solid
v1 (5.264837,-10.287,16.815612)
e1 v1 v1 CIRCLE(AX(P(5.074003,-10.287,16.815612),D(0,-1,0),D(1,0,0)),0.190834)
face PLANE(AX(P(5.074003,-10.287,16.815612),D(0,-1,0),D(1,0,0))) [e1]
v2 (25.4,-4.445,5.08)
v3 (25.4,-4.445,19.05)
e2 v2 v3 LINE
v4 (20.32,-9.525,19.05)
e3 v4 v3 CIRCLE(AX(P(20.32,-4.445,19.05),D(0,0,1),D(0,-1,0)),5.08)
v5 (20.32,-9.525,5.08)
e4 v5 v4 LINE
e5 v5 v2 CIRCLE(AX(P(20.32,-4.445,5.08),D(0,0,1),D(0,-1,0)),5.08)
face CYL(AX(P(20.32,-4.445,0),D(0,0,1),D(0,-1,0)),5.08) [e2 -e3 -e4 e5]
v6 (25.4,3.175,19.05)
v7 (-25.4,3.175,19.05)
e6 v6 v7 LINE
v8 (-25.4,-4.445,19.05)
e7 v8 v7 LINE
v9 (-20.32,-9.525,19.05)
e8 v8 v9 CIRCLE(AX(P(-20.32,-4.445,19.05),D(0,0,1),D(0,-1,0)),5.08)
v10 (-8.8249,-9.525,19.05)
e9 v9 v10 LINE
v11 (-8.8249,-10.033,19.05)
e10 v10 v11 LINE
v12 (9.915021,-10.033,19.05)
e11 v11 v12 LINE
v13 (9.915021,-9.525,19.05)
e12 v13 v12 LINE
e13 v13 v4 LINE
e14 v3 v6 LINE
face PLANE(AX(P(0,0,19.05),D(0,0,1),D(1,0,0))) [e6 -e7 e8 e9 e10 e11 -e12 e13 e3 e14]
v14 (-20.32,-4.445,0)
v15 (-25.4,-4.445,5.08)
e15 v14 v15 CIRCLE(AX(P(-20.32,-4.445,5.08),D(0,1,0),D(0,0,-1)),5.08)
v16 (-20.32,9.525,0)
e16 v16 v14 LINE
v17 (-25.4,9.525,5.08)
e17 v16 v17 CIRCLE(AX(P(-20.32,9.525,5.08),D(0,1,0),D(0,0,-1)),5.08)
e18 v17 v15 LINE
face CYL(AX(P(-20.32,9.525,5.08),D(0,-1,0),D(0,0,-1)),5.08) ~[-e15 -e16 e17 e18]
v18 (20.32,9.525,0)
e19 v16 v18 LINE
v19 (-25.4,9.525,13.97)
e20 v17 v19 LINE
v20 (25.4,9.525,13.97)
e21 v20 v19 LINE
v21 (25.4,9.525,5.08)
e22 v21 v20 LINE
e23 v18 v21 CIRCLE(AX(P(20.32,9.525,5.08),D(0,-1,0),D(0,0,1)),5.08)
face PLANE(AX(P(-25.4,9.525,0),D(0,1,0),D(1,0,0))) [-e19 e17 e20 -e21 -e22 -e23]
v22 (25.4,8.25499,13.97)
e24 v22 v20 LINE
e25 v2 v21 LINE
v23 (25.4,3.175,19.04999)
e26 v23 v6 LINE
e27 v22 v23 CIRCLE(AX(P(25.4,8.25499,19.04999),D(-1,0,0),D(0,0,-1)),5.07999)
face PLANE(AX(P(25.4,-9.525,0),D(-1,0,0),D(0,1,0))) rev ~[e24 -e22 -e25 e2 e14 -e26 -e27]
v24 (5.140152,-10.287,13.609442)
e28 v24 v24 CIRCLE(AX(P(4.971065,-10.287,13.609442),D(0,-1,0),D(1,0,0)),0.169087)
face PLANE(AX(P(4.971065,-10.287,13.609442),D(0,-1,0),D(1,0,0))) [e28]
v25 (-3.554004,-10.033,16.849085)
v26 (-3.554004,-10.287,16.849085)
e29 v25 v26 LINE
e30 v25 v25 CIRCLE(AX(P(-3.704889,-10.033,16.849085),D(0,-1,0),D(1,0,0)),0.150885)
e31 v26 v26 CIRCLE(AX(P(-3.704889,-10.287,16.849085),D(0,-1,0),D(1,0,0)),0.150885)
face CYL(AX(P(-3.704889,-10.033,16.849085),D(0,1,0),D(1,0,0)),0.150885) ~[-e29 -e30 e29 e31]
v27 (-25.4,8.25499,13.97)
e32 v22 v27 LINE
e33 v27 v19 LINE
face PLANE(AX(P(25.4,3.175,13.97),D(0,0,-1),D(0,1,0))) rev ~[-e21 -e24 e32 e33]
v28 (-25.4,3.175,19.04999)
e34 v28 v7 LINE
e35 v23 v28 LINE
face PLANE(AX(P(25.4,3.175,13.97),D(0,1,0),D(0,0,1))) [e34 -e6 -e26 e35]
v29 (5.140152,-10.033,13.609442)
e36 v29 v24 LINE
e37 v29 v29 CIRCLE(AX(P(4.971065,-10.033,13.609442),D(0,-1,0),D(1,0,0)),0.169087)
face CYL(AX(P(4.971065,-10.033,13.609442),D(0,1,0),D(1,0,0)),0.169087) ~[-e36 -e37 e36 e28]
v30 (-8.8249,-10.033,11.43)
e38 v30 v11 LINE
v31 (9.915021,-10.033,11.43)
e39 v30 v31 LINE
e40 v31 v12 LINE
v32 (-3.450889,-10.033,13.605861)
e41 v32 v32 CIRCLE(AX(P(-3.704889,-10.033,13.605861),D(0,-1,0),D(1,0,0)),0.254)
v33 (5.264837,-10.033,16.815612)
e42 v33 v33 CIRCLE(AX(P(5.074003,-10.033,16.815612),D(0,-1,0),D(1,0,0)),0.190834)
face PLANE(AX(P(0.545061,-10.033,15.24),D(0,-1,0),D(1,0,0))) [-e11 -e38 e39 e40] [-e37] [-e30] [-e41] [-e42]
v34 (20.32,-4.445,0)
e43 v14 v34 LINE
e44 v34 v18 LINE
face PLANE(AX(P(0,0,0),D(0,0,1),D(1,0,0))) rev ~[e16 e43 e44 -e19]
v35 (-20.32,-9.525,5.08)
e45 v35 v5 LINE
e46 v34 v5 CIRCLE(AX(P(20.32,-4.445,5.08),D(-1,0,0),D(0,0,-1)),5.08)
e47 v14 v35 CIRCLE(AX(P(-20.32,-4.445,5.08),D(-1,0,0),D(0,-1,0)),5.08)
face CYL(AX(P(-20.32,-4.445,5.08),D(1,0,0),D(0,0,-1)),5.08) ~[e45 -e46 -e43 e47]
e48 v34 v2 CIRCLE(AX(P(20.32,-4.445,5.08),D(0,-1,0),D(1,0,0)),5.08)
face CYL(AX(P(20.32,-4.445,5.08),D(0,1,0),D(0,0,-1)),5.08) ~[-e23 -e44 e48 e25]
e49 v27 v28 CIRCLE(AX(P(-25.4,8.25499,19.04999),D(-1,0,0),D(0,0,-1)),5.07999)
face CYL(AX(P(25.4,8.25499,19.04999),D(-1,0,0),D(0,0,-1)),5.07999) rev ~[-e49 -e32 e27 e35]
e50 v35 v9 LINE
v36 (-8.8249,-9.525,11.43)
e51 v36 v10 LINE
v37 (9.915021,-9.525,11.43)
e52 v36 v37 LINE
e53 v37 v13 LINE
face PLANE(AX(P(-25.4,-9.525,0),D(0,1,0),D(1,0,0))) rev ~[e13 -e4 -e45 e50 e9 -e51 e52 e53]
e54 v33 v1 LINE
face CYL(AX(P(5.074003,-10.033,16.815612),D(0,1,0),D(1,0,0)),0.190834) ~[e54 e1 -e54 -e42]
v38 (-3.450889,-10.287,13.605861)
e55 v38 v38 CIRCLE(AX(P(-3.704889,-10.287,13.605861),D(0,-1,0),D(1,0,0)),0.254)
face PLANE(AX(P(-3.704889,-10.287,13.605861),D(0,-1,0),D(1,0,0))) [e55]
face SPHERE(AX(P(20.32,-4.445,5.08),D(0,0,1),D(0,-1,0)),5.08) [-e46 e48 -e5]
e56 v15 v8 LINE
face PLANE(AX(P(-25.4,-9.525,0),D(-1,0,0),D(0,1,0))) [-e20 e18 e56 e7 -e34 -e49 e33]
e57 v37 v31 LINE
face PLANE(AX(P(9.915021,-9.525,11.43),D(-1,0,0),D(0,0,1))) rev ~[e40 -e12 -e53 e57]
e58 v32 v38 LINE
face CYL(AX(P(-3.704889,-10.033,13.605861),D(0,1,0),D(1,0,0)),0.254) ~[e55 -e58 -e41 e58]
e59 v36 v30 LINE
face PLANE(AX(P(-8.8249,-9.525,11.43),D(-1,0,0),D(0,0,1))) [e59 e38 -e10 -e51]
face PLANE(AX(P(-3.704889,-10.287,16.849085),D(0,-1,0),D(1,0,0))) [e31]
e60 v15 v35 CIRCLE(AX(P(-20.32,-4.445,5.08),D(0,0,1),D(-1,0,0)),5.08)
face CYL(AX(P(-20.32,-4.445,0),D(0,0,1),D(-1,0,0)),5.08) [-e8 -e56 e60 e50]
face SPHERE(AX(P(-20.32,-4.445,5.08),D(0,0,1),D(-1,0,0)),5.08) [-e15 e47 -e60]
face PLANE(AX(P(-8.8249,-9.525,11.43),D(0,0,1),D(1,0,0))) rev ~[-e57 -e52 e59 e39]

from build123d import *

# Parameters (mm, degrees)
F0_W     = 50.8
F0_H     = 19.05
F1_DEPTH = 19.05
F2_R     = 5.08
F3_R     = 5.08
F4_W     = 18.7399210408
F4_H     = 7.62
F5_DEPTH = 0.508
F6_R     = 0.1690866305
F6_R_2   = 0.254
F6_R_3   = 0.1908338751
F6_R_4   = 0.1508847562
F7_DEPTH = 0.254
F8_W     = 6.35
F8_H     = 5.08
F9_DEPTH = 50.8
F10_R    = 5.07999


# Not quite as in the source:
# - a fillet or chamfer is up to 0.001 mm smaller than in the source, because OpenCascade refuses the exact size


with BuildPart() as f1:
    # F0 (on Top) → F1 (new body)
    with BuildSketch(Plane.XY):
        Rectangle(F0_W, F0_H)
    extrude(amount=F1_DEPTH)

    # F2
    f2_edges = [f1.edges().sort_by_distance(p)[0] for p in [
        (-25.4, -9.525, 9.525),
        (25.4, -9.525, 9.525),
    ]]
    fillet(f2_edges, radius=F2_R)

    # F3
    f3_edges = [f1.edges().sort_by_distance(p)[0] for p in [
        (25.4, 2.54, 0),
    ]]
    fillet(f3_edges, radius=F3_R)

    # F4 (on face) → F5 (join)
    with BuildSketch(Plane.XZ.offset(9.525)):
        with Locations((0.5450607277, 15.24)):
            Rectangle(F4_W, F4_H)
    extrude(amount=F5_DEPTH)

    # F6 (on face) → F7 (join)
    with BuildSketch(Plane.XZ.offset(10.033)):
        with Locations((4.971065205, 13.6094420754)):
            Circle(F6_R)
        with Locations((-3.7048892478, 13.6058607324)):
            Circle(F6_R_2)
        with Locations((5.0740026747, 16.8156122121)):
            Circle(F6_R_3)
        with Locations((-3.7048892478, 16.8490853095)):
            Circle(F6_R_4)
    extrude(amount=F7_DEPTH)

    # F8 (on face) → F9 (cut)
    with BuildSketch(Plane.YZ.offset(25.4)):
        with Locations((6.35, 16.51)):
            Rectangle(F8_W, F8_H)
    extrude(amount=-F9_DEPTH, mode=Mode.SUBTRACT)

    # F10 (radius 5.08 in the source; OpenCascade refuses exactly that, so slightly less here)
    f10_edges = [f1.edges().sort_by_distance(p)[0] for p in [
        (0, 3.175, 13.97),
    ]]
    fillet(f10_edges, radius=F10_R)


solid = f1.part
